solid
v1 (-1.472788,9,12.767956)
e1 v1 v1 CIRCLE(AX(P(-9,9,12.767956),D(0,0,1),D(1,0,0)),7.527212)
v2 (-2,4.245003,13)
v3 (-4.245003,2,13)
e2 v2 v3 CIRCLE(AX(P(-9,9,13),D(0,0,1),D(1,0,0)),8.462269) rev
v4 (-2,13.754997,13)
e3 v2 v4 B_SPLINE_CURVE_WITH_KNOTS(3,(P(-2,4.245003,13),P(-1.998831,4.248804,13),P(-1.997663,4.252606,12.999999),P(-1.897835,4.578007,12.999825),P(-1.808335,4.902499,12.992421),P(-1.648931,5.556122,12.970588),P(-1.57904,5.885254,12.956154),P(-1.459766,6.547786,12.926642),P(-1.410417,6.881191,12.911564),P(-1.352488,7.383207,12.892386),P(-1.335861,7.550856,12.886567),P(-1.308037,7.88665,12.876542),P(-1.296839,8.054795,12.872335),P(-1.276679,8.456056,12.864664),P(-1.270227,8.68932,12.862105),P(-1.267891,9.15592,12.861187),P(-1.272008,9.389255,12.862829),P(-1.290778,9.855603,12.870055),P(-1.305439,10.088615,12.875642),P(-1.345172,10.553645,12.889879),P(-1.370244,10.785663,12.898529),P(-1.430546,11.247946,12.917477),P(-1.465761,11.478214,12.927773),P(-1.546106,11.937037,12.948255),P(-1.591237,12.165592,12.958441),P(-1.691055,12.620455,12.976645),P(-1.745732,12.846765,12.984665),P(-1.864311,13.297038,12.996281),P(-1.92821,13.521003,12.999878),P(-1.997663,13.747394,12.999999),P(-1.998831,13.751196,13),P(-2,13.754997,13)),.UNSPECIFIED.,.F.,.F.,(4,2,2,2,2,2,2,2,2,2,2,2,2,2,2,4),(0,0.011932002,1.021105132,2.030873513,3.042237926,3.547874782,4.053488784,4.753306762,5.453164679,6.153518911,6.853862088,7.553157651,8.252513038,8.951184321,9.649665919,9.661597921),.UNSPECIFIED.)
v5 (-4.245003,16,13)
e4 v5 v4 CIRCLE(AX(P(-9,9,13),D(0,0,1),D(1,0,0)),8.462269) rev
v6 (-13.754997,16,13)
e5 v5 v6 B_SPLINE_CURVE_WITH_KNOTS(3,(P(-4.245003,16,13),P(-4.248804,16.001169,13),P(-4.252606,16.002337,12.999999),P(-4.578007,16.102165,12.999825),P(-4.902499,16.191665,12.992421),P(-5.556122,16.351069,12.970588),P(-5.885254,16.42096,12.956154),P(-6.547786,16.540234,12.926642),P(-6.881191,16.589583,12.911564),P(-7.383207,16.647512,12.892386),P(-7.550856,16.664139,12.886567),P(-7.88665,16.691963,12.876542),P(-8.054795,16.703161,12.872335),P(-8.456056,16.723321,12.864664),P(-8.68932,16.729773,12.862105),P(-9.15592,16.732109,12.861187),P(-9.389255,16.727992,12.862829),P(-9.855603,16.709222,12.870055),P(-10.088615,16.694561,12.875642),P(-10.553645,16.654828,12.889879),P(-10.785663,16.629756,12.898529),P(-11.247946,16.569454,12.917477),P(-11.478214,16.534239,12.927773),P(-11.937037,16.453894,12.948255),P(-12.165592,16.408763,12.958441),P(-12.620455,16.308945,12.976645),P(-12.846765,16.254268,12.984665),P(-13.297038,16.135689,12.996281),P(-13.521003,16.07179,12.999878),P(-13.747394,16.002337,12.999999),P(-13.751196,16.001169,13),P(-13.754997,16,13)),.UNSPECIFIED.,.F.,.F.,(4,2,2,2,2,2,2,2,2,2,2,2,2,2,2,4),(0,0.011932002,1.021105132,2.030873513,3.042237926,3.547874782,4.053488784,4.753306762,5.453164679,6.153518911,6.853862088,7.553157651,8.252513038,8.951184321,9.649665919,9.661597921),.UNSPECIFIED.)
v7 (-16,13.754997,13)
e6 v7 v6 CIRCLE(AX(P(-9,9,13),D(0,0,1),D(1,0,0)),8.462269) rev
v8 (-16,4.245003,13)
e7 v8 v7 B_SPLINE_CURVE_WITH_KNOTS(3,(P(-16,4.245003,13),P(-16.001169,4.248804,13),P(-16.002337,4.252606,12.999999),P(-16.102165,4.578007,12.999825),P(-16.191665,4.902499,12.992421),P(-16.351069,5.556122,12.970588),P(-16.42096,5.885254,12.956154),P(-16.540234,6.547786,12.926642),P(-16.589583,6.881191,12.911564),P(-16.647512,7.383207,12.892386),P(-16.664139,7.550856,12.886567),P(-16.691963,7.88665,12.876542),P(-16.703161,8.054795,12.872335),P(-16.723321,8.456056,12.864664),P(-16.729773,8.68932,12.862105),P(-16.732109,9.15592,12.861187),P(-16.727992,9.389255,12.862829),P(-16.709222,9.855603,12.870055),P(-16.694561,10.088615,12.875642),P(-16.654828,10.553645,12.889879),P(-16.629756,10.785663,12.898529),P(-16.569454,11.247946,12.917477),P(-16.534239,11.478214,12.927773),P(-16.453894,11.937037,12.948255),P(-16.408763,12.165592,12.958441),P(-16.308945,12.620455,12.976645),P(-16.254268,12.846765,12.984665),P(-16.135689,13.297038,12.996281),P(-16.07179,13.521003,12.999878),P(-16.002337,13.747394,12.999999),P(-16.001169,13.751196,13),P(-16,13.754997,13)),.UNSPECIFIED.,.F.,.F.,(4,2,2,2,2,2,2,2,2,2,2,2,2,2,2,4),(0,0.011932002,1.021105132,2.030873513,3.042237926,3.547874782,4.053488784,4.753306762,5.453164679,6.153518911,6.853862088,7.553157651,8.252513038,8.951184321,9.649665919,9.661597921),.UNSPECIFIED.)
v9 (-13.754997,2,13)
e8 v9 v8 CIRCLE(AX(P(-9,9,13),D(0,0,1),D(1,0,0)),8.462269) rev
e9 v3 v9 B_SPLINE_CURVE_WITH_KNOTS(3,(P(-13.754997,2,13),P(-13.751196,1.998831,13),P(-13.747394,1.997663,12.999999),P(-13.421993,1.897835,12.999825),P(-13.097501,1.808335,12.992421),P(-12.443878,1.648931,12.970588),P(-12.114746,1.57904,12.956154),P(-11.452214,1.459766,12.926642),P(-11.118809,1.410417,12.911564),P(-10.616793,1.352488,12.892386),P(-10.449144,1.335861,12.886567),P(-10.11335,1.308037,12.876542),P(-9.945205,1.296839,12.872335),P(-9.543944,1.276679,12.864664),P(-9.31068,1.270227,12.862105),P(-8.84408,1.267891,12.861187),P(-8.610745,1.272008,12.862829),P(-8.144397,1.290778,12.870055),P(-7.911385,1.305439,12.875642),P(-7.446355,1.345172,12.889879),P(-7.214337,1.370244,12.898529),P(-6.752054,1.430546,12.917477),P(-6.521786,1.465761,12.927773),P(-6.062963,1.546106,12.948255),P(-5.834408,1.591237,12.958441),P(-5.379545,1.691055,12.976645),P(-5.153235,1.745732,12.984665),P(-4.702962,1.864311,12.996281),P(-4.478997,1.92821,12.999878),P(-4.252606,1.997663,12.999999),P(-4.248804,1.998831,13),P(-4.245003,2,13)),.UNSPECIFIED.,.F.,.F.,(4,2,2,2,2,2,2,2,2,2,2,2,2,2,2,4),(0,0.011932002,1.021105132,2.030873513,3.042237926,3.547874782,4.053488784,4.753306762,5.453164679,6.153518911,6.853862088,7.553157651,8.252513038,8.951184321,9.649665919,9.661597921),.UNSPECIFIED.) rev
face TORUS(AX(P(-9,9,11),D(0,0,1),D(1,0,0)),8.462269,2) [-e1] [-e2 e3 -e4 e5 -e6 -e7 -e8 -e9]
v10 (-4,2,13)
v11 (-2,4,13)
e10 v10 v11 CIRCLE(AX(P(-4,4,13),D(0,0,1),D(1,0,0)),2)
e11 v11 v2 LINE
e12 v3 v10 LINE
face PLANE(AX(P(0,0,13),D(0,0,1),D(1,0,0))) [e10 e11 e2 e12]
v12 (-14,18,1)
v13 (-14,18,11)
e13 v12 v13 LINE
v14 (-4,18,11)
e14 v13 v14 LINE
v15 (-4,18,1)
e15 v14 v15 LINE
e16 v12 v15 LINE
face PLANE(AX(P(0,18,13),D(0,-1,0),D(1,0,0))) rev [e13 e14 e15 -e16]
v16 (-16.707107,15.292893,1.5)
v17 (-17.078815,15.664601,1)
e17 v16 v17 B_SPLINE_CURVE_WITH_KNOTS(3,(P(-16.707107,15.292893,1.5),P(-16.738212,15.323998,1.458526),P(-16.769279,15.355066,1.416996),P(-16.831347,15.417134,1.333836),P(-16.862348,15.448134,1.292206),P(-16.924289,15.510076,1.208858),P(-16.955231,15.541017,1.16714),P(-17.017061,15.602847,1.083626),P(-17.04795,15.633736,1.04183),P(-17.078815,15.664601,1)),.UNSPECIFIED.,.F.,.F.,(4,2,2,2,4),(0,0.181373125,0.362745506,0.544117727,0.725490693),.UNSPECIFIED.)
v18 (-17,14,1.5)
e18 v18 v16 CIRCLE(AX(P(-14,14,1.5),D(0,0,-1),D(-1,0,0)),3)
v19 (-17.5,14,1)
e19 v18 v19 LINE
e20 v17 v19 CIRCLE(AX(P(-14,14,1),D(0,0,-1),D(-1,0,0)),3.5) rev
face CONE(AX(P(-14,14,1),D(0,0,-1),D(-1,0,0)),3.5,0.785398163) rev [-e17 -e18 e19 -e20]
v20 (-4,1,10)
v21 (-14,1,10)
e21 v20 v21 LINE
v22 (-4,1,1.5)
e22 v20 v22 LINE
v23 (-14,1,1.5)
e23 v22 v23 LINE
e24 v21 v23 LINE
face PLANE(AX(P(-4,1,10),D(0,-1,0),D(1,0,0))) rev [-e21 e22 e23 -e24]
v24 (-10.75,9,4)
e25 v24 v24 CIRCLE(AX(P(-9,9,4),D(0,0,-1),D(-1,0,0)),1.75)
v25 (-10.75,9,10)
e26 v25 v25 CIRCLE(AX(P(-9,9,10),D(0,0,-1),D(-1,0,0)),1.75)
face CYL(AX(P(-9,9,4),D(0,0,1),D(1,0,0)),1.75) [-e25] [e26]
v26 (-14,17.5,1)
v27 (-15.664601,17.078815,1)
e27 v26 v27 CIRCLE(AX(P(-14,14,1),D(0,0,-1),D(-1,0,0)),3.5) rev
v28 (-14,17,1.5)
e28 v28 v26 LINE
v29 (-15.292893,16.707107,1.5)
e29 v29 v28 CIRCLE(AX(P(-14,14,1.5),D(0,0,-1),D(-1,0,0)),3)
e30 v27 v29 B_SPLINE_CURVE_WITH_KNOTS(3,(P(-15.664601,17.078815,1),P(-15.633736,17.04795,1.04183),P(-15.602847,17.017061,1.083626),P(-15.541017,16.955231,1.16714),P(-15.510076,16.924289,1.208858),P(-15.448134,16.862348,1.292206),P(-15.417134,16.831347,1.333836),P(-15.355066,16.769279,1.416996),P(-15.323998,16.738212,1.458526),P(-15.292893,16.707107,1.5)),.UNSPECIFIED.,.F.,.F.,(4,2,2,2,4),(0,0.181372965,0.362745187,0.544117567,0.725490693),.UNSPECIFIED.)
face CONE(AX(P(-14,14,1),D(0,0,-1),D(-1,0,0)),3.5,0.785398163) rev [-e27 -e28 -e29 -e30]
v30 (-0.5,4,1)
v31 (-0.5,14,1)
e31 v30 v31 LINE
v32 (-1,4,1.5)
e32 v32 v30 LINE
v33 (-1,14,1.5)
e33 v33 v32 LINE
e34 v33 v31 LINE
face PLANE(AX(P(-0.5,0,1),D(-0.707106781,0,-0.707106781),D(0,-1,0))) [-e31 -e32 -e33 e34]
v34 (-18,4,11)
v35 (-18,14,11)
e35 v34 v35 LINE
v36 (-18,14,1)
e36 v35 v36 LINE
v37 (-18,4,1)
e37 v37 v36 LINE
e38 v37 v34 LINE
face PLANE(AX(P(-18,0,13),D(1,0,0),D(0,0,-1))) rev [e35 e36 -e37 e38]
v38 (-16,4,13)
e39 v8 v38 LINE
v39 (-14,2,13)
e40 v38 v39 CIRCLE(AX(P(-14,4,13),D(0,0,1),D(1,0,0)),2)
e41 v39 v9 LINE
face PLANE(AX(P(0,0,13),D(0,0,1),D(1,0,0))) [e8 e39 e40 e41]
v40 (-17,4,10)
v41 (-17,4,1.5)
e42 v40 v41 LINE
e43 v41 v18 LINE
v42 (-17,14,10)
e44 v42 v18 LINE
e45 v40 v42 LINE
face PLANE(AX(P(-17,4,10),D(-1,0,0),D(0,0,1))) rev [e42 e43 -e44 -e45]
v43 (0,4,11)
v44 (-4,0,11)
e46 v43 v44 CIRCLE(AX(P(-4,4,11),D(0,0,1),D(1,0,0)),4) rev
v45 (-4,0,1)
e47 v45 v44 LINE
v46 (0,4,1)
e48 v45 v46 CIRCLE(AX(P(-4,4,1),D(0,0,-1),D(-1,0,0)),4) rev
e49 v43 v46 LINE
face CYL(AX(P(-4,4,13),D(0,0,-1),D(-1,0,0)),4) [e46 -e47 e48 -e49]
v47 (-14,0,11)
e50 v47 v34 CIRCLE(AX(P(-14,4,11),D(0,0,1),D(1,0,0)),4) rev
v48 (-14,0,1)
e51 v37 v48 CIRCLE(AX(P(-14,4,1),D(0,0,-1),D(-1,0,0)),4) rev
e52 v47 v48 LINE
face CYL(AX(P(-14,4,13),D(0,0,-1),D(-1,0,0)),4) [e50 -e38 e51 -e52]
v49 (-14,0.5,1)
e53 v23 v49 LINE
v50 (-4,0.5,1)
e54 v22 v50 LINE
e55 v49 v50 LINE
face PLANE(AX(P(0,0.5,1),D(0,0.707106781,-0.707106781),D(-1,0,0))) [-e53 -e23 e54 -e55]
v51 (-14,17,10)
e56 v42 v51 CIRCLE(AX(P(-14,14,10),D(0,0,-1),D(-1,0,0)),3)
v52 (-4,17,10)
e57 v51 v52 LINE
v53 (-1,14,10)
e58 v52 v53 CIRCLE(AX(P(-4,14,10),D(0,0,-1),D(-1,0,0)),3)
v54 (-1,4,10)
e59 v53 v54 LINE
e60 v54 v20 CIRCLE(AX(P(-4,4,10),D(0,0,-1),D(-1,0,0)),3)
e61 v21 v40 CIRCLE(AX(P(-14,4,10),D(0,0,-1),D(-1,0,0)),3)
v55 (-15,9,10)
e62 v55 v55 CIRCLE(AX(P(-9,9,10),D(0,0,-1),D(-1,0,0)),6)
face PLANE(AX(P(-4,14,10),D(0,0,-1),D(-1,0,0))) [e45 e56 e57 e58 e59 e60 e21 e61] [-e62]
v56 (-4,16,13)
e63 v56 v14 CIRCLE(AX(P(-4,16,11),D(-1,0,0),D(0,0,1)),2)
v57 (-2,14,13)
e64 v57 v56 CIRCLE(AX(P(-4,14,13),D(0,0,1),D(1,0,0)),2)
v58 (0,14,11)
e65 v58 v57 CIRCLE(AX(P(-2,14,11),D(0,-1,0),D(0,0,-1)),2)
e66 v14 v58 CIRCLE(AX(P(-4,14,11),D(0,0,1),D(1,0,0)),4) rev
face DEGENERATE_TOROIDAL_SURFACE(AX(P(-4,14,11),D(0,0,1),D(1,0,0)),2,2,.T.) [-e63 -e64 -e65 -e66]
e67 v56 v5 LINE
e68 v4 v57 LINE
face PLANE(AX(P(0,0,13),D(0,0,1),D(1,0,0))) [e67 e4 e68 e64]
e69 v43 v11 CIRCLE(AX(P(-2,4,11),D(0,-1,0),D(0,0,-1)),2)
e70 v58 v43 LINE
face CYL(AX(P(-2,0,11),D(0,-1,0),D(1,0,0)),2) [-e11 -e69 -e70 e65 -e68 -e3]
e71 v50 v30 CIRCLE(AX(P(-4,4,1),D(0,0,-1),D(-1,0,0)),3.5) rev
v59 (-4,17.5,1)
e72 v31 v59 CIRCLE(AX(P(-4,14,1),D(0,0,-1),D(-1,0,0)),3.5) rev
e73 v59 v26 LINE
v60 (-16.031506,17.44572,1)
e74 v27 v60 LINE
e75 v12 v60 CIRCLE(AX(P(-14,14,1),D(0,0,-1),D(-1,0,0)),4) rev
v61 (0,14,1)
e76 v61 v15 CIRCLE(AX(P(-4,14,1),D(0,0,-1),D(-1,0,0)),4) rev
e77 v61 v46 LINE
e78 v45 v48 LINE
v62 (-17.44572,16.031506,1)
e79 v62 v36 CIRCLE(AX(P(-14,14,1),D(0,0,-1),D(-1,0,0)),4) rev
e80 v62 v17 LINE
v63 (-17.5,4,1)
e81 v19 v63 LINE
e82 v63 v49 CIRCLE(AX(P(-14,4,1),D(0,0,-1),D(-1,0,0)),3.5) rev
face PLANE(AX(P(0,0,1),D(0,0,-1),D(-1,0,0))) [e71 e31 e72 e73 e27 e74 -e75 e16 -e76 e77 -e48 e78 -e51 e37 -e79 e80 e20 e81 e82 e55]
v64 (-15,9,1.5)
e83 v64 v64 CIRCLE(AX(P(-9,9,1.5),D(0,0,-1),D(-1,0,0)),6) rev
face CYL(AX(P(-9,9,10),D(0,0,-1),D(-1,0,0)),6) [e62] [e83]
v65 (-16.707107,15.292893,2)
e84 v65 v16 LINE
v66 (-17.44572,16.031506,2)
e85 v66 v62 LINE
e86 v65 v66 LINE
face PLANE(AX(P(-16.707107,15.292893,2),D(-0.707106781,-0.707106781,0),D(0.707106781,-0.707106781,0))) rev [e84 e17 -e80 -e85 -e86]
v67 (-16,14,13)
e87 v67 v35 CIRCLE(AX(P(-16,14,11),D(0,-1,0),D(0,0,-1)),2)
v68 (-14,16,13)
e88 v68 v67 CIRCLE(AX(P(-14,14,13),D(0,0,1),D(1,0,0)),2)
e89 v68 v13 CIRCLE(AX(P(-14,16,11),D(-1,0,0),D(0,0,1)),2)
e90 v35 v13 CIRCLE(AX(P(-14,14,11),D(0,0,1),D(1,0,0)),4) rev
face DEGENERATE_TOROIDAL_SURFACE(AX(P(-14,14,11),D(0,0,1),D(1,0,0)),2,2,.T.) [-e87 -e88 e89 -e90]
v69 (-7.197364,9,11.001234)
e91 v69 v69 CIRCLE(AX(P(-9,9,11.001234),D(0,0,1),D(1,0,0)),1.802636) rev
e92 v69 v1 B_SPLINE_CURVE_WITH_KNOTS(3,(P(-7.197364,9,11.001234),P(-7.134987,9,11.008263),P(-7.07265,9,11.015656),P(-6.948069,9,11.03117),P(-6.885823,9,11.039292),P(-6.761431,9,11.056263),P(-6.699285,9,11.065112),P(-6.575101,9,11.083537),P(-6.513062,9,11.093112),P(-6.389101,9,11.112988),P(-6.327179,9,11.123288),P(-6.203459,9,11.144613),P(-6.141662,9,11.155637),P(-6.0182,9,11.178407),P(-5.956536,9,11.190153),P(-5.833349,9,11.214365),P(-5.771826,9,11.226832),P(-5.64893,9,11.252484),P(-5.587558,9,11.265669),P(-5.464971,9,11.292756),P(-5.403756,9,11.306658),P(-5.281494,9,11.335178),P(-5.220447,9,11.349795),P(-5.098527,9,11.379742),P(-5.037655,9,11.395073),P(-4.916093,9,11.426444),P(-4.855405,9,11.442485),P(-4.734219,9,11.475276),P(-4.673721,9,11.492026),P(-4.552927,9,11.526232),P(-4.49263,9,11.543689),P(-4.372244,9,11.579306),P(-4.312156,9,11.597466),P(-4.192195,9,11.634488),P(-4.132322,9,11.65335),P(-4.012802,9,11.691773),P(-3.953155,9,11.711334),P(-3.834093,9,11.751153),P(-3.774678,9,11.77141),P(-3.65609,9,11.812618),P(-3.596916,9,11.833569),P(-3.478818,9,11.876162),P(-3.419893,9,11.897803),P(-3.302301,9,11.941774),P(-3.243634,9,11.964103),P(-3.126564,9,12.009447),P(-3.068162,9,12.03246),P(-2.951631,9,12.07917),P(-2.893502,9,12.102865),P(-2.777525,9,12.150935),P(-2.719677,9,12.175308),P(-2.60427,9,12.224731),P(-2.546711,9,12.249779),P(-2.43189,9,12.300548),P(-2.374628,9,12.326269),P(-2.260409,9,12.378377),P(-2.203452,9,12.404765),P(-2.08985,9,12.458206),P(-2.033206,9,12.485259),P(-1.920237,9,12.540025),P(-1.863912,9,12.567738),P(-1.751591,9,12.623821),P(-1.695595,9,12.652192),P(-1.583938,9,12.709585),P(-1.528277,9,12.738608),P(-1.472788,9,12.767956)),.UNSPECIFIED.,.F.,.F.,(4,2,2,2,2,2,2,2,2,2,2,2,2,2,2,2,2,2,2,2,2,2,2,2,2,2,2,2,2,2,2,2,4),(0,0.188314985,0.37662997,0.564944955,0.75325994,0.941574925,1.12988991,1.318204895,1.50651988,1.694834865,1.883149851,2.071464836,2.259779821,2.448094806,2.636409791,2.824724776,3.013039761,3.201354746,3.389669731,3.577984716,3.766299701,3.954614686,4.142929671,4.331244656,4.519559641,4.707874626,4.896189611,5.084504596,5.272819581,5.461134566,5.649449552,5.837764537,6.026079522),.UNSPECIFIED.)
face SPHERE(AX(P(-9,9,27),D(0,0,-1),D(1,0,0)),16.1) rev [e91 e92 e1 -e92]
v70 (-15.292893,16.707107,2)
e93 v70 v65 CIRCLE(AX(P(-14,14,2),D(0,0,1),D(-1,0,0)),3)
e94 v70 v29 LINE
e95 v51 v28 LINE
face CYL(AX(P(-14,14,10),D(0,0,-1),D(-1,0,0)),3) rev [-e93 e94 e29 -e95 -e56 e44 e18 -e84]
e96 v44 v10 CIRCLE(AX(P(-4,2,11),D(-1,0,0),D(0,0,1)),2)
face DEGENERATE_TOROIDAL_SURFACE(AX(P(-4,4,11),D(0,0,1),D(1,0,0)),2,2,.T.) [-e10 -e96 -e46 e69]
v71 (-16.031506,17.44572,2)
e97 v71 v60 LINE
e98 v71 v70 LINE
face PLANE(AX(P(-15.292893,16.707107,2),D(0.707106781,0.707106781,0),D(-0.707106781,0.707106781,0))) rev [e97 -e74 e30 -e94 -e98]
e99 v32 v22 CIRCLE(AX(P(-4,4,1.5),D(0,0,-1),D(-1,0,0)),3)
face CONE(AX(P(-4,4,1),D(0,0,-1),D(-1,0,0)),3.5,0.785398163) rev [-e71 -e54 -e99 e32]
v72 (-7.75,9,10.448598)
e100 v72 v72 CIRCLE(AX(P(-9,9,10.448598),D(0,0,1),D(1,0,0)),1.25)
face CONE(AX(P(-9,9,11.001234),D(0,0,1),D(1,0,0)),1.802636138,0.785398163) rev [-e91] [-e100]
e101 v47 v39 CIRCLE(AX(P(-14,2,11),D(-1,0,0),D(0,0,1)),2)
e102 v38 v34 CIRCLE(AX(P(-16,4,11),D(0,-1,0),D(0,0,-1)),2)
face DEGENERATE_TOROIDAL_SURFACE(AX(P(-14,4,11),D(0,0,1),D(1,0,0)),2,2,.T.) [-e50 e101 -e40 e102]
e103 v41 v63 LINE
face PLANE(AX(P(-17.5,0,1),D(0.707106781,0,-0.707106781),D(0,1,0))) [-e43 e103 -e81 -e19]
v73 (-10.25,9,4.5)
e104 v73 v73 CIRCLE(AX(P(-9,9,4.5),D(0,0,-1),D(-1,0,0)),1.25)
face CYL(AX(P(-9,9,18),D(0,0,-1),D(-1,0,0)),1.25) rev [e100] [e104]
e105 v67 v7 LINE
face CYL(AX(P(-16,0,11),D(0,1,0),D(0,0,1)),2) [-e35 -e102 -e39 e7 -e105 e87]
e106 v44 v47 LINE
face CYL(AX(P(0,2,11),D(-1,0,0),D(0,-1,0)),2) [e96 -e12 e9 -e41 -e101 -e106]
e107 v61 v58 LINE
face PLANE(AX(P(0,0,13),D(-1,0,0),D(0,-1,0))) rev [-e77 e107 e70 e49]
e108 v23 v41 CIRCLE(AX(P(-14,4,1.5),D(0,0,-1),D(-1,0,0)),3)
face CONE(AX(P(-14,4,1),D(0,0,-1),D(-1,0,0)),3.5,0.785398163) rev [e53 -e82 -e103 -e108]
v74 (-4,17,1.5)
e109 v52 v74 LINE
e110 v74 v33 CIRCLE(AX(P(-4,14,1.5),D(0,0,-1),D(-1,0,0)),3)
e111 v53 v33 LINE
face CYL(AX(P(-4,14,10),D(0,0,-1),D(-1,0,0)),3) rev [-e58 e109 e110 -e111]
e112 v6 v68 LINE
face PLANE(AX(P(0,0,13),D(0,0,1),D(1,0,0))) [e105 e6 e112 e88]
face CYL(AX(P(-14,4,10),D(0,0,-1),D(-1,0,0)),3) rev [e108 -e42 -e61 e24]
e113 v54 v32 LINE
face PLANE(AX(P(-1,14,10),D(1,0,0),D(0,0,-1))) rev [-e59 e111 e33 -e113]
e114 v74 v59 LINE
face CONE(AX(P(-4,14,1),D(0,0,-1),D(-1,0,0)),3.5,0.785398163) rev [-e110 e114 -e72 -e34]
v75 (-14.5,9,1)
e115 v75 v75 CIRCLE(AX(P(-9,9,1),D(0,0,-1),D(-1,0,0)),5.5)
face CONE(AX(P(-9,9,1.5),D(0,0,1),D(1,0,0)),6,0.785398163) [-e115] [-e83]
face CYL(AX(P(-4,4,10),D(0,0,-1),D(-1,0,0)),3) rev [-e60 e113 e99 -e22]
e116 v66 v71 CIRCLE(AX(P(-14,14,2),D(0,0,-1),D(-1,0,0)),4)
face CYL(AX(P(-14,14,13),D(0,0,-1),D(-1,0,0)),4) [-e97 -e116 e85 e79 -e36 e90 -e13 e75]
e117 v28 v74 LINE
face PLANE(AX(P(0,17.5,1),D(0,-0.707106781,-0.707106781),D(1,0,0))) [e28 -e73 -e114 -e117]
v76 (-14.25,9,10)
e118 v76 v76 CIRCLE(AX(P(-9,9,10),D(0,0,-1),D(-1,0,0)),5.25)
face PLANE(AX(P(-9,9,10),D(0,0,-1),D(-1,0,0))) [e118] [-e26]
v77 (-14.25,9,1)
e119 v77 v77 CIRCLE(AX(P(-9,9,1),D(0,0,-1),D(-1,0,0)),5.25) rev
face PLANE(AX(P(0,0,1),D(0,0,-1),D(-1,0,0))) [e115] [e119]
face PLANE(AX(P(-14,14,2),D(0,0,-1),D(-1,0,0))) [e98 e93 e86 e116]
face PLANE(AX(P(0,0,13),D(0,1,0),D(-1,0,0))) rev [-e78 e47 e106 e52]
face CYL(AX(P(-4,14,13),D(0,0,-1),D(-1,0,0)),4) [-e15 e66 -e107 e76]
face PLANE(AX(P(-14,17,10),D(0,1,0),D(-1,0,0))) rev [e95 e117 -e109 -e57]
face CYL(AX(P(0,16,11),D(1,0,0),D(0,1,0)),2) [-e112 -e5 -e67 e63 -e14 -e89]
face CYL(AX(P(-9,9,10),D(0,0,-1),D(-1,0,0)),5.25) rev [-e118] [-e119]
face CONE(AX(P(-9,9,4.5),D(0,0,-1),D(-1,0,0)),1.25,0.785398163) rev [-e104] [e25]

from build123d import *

# Parameters (mm, degrees)
SKETCH1_W           = 18
SKETCH1_H           = 18
BOSS_EXTRUDE1_DEPTH = 13
FILLET1_R           = 4
SKETCH2_R           = 1.25
CUT_EXTRUDE1_DEPTH  = 18
SKETCH3_R           = 6
CUT_EXTRUDE2_DEPTH  = 10
SKETCH4_R           = 5.25
CUT_EXTRUDE3_DEPTH  = 10
BOSS_EXTRUDE2_START = 6
SKETCH5_R           = 1.75
SKETCH5_R_2         = 1.25
BOSS_EXTRUDE2_DEPTH = 6
FILLET2_R           = 2
CUT_EXTRUDE4_DEPTH  = 2
SKETCH10_W          = 22.06427133
SKETCH10_H          = 21.544432477
CUT_EXTRUDE5_DEPTH  = 1
CHAMFER1_SIZE       = 0.5
CHAMFER2_SIZE       = 0.5
CHAMFER3_SIZE       = 0.5


# Some blends are built 0.0001 mm under size
with BuildPart() as part:
    # Sketch1 → Boss-Extrude1 (new body)
    with BuildSketch(Plane.XY):
        with Locations((-9, 9)):
            Rectangle(SKETCH1_W, SKETCH1_H)
    extrude(amount=BOSS_EXTRUDE1_DEPTH)

    # Fillet1
    fillet1_edges = [part.edges().sort_by_distance(p)[0] for p in [
        (0, 0, 6.5),
        (-18, 0, 6.5),
        (-18, 18, 6.5),
        (0, 18, 6.5),
    ]]
    fillet(fillet1_edges, radius=FILLET1_R)

    # Sketch2 → Cut-Extrude1 (cut)
    with BuildSketch(Plane(origin=(0, 0, 0), x_dir=(-1, 0, 0), z_dir=(0, 0, -1))):
        with Locations((9, 9)):
            Circle(SKETCH2_R)
    extrude(amount=-CUT_EXTRUDE1_DEPTH, mode=Mode.SUBTRACT)

    # Sketch3 → Cut-Extrude2 (cut)
    with BuildSketch(Plane(origin=(0, 0, 0), x_dir=(-1, 0, 0), z_dir=(0, 0, -1))):
        with BuildLine():
            Line((1, 14), (1, 4))
            ThreePointArc((1, 4), (1.878679656, 1.878679656), (4, 1))
            Line((4, 1), (14, 1))
            ThreePointArc((14, 1), (16.121320344, 1.878679656), (17, 4))
            Line((17, 4), (17, 14))
            ThreePointArc((17, 14), (16.121320344, 16.121320344), (14, 17))
            Line((14, 17), (4, 17))
            ThreePointArc((4, 17), (1.878679656, 16.121320344), (1, 14))
        make_face()
        with Locations((9, 9)):
            Circle(SKETCH3_R, mode=Mode.SUBTRACT)
    extrude(amount=-CUT_EXTRUDE2_DEPTH, mode=Mode.SUBTRACT)

    # Sketch4 → Cut-Extrude3 (cut)
    with BuildSketch(Plane(origin=(0, 0, 0), x_dir=(-1, 0, 0), z_dir=(0, 0, -1))):
        with Locations((9, 9)):
            Circle(SKETCH4_R)
    extrude(amount=-CUT_EXTRUDE3_DEPTH, mode=Mode.SUBTRACT)

    # Sketch5 → Boss-Extrude2 (add)
    with BuildSketch(Plane(origin=(0, 0, 10), x_dir=(-1, 0, 0), z_dir=(0, 0, -1)).offset(BOSS_EXTRUDE2_START)):
        with Locations((9, 9)):
            Circle(SKETCH5_R)
        with Locations((9, 9)):
            Circle(SKETCH5_R_2, mode=Mode.SUBTRACT)
    extrude(amount=-BOSS_EXTRUDE2_DEPTH)

    # Sketch7 → Cut-Revolve4 (revolve, cut)
    with BuildSketch(Plane(origin=(0, 9, 0), x_dir=(1, 0, 0), z_dir=(0, 1, 0))):
        with BuildLine():
            Line((-9, -10.9), (-9, -43.1))
            ThreePointArc((-9, -43.1), (7.1, -27), (-9, -10.9))
        make_face()
    revolve(axis=Axis((-9, 9, 0), (0, 0, 1)), mode=Mode.SUBTRACT)

    # Fillet2
    # the kernel refuses this fillet: 2 mm, written as the material it takes off along each edge
    with BuildSketch(Plane(origin=(0, 14, 13), x_dir=(-1, 0, 0), z_dir=(0, -1, 0)), Plane(origin=(-14, 18, 13), x_dir=(0, -1, 0), z_dir=(1, 0, 0)), Plane(origin=(-18, 4, 13), x_dir=(1, 0, 0), z_dir=(0, 1, 0))) as fillet2_piece_1:
        with BuildLine():
            CenterArc((FILLET2_R, FILLET2_R), FILLET2_R, 180, 90)
            Line((0, FILLET2_R), (0, 0))
            Line((0, 0), (FILLET2_R, 0))
        make_face()
    extrude(amount=10, mode=Mode.SUBTRACT)
    with BuildSketch(Plane(origin=(-4, 0, 13), x_dir=(0, 0, -1), z_dir=(-1, 0, 0))) as fillet2_piece_2:
        with BuildLine():
            CenterArc((FILLET2_R, -FILLET2_R), FILLET2_R, 90, 90)
            Line((0, -FILLET2_R), (0, 0))
            Line((0, 0), (FILLET2_R, 0))
        make_face()
    extrude(amount=10, mode=Mode.SUBTRACT)
    with BuildSketch(Plane(origin=(-4, 14, 13), x_dir=(0, 1, 0), z_dir=(-1, 0, 0))) as fillet2_piece_3:
        with BuildLine():
            CenterArc((4 - FILLET2_R, FILLET2_R), FILLET2_R, 270, 90)
            Line((4, FILLET2_R), (4, 0))
            Line((4, 0), (4 - FILLET2_R, 0))
        make_face()
    revolve(axis=Axis((-4, 14, 13), (0, 0, -1)), revolution_arc=90, mode=Mode.SUBTRACT)
    with BuildSketch(Plane(origin=(-14, 14, 13), x_dir=(-1, 0, 0), z_dir=(0, -1, 0))) as fillet2_piece_4:
        with BuildLine():
            CenterArc((4 - FILLET2_R, FILLET2_R), FILLET2_R, 270, 90)
            Line((4, FILLET2_R), (4, 0))
            Line((4, 0), (4 - FILLET2_R, 0))
        make_face()
    revolve(axis=Axis((-14, 14, 13), (0, 0, -1)), revolution_arc=90, mode=Mode.SUBTRACT)
    with BuildSketch(Plane(origin=(-14, 4, 13), x_dir=(0, -1, 0), z_dir=(1, 0, 0))) as fillet2_piece_5:
        with BuildLine():
            CenterArc((4 - FILLET2_R, FILLET2_R), FILLET2_R, 270, 90)
            Line((4 - FILLET2_R, 0), (4, 0))
            Line((4, 0), (4, FILLET2_R))
        make_face()
    revolve(axis=Axis((-14, 4, 13), (0, 0, -1)), revolution_arc=90, mode=Mode.SUBTRACT)
    with BuildSketch(Plane(origin=(-4, 4, 13), x_dir=(0, -1, 0), z_dir=(-1, 0, 0))) as fillet2_piece_6:
        with BuildLine():
            CenterArc((4 - FILLET2_R, -FILLET2_R), FILLET2_R, 0, 90)
            Line((4 - FILLET2_R, 0), (4, 0))
            Line((4, 0), (4, -FILLET2_R))
        make_face()
    revolve(axis=Axis((-4, 4, 13), (0, 0, 1)), revolution_arc=90, mode=Mode.SUBTRACT)
    with BuildSketch(Plane(origin=(-9, 9, 13), x_dir=(1, 0, 0), z_dir=(0, 1, 0))) as fillet2_piece_7:
        with BuildLine():
            CenterArc((8.462269199, 2), FILLET2_R, 242.126002653, 27.873997347)
            ThreePointArc((7.527211829, 0.232044199), (7.73971142, 0.117608407), (7.950471684, 0))
            Line((7.950471684, 0), (8.462269199, 0))
        make_face()
    revolve(axis=Axis((-9, 9, 13), (0, 0, -1)), mode=Mode.SUBTRACT)

    # Sketch9 → Cut-Extrude4 (cut)
    with BuildSketch(Plane(origin=(0, 0, 0), x_dir=(-1, 0, 0), z_dir=(0, 0, -1))):
        with BuildLine():
            Line((16.707106781, 15.292893219), (17.445719569, 16.031506006))
            ThreePointArc((17.445719569, 16.031506006), (16.828427125, 16.828427125), (16.031506006, 17.445719569))
            Line((16.031506006, 17.445719569), (15.292893219, 16.707106781))
            ThreePointArc((15.292893219, 16.707106781), (16.121320344, 16.121320344), (16.707106781, 15.292893219))
        make_face()
    extrude(amount=-CUT_EXTRUDE4_DEPTH, mode=Mode.SUBTRACT)

    # Sketch10 → Cut-Extrude5 (cut)
    with BuildSketch(Plane(origin=(0, 0, 0), x_dir=(-1, 0, 0), z_dir=(0, 0, -1))):
        with Locations((9.251838168, 8.653440765)):
            Rectangle(SKETCH10_W, SKETCH10_H)
    extrude(amount=-CUT_EXTRUDE5_DEPTH, mode=Mode.SUBTRACT)

    # Chamfer1
    chamfer1_edges = [part.edges().sort_by_distance(p)[0] for p in [
        (-1, 9, 1),
        (-1.878679656, 16.121320344, 1),
        (-9, 17, 1),
        (-14.662827148, 16.925860587, 1),
        (-16.925860587, 14.662827148, 1),
        (-17, 9, 1),
        (-16.121320344, 1.878679656, 1),
        (-9, 1, 1),
        (-1.878679656, 1.878679656, 1),
        (-3, 9, 1),
    ]]
    chamfer(chamfer1_edges, length=CHAMFER1_SIZE)

    # Chamfer2
    chamfer2_edges = [part.edges().sort_by_distance(p)[0] for p in [
        (-7.75, 9, 4),
    ]]
    chamfer(chamfer2_edges, length=CHAMFER2_SIZE - 0.0001)  # a hair under: the kernel refuses the full size

    # Chamfer3
    # the kernel refuses this chamfer: 0.543867406, 0.5 mm, written as the material it takes off along each edge
    with BuildSketch(Plane(origin=(-9, 9, 10.948598192), x_dir=(-1, 0, 0), z_dir=(0, -1, 0))) as chamfer3_piece_1:
        with BuildLine():
            Line((1.25, CHAMFER3_SIZE), (1.802636138, -0.052636138))
            ThreePointArc((1.802636138, -0.052636138), (1.534897868, -0.024733766), (1.25, 0))
            Line((1.25, 0), (1.25, CHAMFER3_SIZE))
        make_face()
    revolve(axis=Axis((-9, 9, 10.948598192), (0, 0, -1)), revolution_arc=180, mode=Mode.SUBTRACT)
    with BuildSketch(Plane(origin=(-9, 9, 10.948598192), x_dir=(1, 0, 0), z_dir=(0, 1, 0))) as chamfer3_piece_2:
        with BuildLine():
            Line((1.25, CHAMFER3_SIZE), (1.802636138, -0.052636138))
            ThreePointArc((1.802636138, -0.052636138), (1.534897868, -0.024733766), (1.25, 0))
            Line((1.25, 0), (1.25, CHAMFER3_SIZE))
        make_face()
    revolve(axis=Axis((-9, 9, 10.948598192), (0, 0, -1)), revolution_arc=180, mode=Mode.SUBTRACT)


solid = part.part
